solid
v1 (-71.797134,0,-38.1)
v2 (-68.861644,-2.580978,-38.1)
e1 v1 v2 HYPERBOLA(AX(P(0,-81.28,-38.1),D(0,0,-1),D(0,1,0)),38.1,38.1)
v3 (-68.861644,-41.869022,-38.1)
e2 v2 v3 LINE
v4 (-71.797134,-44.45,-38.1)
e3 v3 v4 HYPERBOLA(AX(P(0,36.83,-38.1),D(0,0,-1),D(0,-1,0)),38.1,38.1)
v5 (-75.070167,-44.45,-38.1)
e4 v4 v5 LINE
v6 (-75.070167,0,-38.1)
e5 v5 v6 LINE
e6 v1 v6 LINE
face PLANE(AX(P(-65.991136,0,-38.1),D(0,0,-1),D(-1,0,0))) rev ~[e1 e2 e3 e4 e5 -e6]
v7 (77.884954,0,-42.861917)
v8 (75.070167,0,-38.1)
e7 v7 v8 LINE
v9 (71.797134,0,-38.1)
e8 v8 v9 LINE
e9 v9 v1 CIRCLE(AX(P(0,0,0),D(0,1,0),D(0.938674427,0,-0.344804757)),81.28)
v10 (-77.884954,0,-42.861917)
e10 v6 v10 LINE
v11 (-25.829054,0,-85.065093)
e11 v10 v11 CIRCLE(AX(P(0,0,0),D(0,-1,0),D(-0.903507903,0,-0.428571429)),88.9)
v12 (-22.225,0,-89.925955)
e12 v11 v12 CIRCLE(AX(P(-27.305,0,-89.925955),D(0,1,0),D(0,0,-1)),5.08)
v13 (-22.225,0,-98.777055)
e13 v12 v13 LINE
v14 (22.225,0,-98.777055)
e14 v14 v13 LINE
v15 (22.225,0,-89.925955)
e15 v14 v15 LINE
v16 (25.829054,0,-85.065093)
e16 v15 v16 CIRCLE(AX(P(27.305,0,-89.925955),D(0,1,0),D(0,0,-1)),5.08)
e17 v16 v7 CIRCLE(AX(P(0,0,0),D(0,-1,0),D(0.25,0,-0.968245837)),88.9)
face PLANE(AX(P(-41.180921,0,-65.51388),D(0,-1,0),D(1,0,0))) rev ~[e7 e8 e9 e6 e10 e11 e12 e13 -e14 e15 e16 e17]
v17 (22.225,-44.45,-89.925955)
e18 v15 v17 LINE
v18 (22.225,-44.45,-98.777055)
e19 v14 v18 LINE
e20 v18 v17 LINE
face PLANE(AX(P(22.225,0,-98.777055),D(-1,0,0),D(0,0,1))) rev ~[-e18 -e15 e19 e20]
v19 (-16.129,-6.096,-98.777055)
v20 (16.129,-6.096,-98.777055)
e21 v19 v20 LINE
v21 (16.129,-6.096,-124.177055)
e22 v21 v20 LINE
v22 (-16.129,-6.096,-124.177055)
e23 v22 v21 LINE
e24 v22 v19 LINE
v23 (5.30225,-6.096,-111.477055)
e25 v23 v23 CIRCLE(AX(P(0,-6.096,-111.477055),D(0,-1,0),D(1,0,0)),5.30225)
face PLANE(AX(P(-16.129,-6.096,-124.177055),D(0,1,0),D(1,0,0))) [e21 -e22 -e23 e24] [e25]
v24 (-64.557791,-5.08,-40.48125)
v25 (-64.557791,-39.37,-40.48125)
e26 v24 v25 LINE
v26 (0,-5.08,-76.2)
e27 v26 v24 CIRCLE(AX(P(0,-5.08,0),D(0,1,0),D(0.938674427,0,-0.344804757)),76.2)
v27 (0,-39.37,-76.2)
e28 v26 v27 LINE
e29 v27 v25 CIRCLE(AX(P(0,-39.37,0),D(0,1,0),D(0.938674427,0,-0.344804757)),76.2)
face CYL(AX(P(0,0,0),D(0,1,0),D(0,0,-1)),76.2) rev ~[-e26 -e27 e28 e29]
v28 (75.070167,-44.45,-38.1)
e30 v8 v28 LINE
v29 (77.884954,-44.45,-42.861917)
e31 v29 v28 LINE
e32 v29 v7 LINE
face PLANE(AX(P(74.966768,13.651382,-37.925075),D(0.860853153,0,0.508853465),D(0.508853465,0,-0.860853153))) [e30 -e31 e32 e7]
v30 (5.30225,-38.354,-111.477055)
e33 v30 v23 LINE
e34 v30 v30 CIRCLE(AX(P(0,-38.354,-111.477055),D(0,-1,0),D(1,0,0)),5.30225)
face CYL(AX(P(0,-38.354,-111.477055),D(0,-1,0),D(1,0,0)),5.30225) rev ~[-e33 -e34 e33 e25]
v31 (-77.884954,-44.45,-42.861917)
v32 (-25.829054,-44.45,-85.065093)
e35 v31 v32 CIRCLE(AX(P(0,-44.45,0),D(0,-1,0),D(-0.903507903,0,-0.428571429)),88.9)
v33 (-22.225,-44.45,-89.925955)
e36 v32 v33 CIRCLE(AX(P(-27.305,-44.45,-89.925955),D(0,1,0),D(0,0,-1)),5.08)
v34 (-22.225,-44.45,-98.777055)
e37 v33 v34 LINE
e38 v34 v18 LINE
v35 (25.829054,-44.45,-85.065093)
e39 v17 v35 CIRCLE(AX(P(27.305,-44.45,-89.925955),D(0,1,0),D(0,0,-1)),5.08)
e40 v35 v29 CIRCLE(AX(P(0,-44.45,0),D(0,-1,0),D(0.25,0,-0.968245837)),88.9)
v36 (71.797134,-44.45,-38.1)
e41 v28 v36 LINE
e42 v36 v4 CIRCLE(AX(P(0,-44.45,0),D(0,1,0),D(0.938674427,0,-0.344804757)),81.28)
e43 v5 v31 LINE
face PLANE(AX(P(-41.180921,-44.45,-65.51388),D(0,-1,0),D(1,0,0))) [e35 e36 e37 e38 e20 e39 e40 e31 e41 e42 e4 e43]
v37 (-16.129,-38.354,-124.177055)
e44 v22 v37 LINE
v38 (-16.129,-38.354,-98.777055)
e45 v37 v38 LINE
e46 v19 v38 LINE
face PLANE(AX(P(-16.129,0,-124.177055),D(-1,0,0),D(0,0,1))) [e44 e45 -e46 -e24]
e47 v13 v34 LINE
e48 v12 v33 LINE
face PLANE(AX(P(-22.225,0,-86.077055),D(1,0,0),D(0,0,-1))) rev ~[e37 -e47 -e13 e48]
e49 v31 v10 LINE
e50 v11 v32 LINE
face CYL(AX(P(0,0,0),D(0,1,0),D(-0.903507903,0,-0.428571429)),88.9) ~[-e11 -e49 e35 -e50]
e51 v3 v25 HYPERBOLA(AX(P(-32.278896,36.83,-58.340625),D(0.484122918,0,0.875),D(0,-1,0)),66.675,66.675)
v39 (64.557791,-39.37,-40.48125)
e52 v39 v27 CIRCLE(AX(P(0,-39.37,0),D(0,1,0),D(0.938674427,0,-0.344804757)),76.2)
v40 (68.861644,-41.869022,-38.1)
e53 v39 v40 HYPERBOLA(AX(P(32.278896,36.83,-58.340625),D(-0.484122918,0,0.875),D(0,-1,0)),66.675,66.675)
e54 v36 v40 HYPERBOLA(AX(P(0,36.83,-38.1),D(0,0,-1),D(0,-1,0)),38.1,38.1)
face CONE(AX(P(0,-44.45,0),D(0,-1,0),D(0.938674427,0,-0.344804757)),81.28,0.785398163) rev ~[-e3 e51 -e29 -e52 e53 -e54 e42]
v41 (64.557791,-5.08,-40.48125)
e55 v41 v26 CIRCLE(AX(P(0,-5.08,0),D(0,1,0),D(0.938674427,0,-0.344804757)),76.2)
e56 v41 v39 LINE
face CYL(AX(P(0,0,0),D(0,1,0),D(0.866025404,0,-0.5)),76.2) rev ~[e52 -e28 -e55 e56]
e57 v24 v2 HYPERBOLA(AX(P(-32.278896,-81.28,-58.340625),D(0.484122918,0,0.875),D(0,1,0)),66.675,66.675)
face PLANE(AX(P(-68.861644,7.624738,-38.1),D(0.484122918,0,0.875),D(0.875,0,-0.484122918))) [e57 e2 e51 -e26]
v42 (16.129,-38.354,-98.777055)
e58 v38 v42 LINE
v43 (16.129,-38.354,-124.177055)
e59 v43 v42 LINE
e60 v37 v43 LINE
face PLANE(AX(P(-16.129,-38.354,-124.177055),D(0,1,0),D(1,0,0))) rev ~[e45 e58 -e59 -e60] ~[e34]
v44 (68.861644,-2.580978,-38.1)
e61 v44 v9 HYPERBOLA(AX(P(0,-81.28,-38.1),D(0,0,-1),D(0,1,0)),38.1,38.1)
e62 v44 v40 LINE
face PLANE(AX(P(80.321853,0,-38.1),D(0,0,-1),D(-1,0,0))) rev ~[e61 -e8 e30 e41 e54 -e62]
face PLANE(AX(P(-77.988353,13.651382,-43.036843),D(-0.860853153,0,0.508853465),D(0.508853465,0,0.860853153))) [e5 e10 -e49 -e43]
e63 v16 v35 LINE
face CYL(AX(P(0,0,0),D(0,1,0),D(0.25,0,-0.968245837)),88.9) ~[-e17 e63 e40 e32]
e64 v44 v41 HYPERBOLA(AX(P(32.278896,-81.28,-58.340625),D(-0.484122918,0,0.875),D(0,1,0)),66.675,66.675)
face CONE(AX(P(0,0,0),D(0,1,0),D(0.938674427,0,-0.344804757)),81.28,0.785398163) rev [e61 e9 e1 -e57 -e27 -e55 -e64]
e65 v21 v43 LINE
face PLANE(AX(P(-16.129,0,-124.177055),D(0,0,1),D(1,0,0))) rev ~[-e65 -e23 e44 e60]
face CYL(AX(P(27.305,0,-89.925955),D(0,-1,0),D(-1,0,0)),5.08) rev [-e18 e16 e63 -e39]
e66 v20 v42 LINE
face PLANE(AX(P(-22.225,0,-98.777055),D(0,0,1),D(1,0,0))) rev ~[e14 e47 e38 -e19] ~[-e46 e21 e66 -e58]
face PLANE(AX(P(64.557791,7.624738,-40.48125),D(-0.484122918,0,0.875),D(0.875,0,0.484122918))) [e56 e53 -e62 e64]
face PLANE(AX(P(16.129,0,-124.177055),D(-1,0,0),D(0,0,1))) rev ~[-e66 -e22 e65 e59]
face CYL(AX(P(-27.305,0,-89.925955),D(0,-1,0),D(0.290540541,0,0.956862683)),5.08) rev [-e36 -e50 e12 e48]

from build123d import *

# Parameters (mm, degrees)
F0_W        = 16.129
F0_H        = 25.4
F1_DEPTH    = 44.45
F2_W        = 32.258
F2_H        = 6.096
F3_DEPTH    = 25.4
F4_R        = 5.30225
F5_DEPTH    = 38.355
F6_R        = 5.08
F7_T1_DEPTH = 59.6994752683
F7_T4_ANGLE = 139.6602442287
F7_T6_ANGLE = 139.6602442287
F8_T1_DEPTH = 71.752763855


# Not quite as in the source:
# - a fillet or chamfer that OpenCascade refuses, or shapes differently, is made with other operations: its cross-section is extruded or revolved along the edge and cut away or added


with BuildPart() as f1:
    # F0 (on Front) → F1 (new body)
    with BuildSketch(Plane.XZ):
        with BuildLine():
            ThreePointArc((0, -76.2), (-38.1, -65.9911357684), (-65.9911357684, -38.1))
            Line((-65.9911357684, -38.1), (-80.3218525683, -38.1))
            ThreePointArc((-80.3218525683, -38.1), (-56.6075409411, -68.5477666201), (-22.225, -86.0770548695))
            Line((-22.225, -86.0770548695), (0, -86.0770548695))
            Line((0, -86.0770548695), (0, -76.2))
        make_face()
        with BuildLine():
            Line((80.3218525683, -38.1), (65.9911357684, -38.1))
            ThreePointArc((65.9911357684, -38.1), (38.1, -65.9911357684), (0, -76.2))
            Line((0, -76.2), (0, -86.0770548695))
            Line((0, -86.0770548695), (22.225, -86.0770548695))
            ThreePointArc((22.225, -86.0770548695), (56.6075409411, -68.5477666201), (80.3218525683, -38.1))
        make_face()
        with BuildLine():
            Line((22.225, -98.7770548695), (22.225, -86.0770548695))
            ThreePointArc((22.225, -86.0770548695), (11.2017816017, -88.1914399982), (0, -88.9))
            Line((0, -88.9), (0, -98.7770548695))
            Line((0, -98.7770548695), (16.129, -98.7770548695))
            Line((16.129, -98.7770548695), (22.225, -98.7770548695))
        make_face()
        with BuildLine():
            ThreePointArc((0, -88.9), (-11.2017816017, -88.1914399982), (-22.225, -86.0770548695))
            Line((-22.225, -86.0770548695), (-22.225, -98.7770548695))
            Line((-22.225, -98.7770548695), (-16.129, -98.7770548695))
            Line((-16.129, -98.7770548695), (0, -98.7770548695))
            Line((0, -98.7770548695), (0, -88.9))
        make_face()
        with Locations((8.0645, -111.4770548695)):
            Rectangle(F0_W, F0_H)
        with Locations((-8.0645, -111.4770548695)):
            Rectangle(F0_W, F0_H)
        with BuildLine():
            Line((22.225, -86.0770548695), (0, -86.0770548695))
            Line((0, -86.0770548695), (0, -88.9))
            ThreePointArc((0, -88.9), (11.2017816017, -88.1914399982), (22.225, -86.0770548695))
        make_face()
        with BuildLine():
            Line((0, -88.9), (0, -86.0770548695))
            Line((0, -86.0770548695), (-22.225, -86.0770548695))
            ThreePointArc((-22.225, -86.0770548695), (-11.2017816017, -88.1914399982), (0, -88.9))
        make_face()
    extrude(amount=F1_DEPTH)

    # F2 (on face) → F3 (cut)
    with BuildSketch(Plane(origin=(0, 0, -124.1770548695), x_dir=(1, 0, 0), z_dir=(0, 0, -1))):
        with Locations((0, 41.402)):
            Rectangle(F2_W, F2_H)
        with Locations((0, 3.048)):
            Rectangle(F2_W, F2_H)
    extrude(amount=-F3_DEPTH, mode=Mode.SUBTRACT)

    # F4 (on face) → F5 (cut, through all)
    with BuildSketch(Plane.XZ.offset(38.354)):
        with Locations((0, -111.4770548695)):
            Circle(F4_R)
    extrude(amount=-F5_DEPTH, mode=Mode.SUBTRACT)

    # F6
    f6_edges = [f1.edges().sort_by_distance(p)[0] for p in [
        (-22.225, -22.225, -86.077055),
        (22.225, -22.225, -86.077055),
    ]]
    fillet(f6_edges, radius=F6_R)

    # F7: chamfer of 5.08 on 4 edges, made by hand

    # F7_s2 → F7_t1 (cut)
    with BuildSketch(Plane.XZ.offset(-7.6247376341)):
        with BuildLine():
            Line((-68.8616438956, -38.1), (-64.5577911521, -40.48125))
            ThreePointArc((-64.5577911521, -40.48125), (-65.2398633811, -39.3725821609), (-65.9911357684, -38.1))
            Line((-65.9911357684, -38.1), (-68.8616438956, -38.1))
        make_face()
        with BuildLine():
            Line((64.5577911521, -40.48125), (68.8616438956, -38.1))
            Line((68.8616438956, -38.1), (65.9911357684, -38.1))
            ThreePointArc((65.9911357684, -38.1), (65.2398633811, -39.3725821609), (64.5577911521, -40.48125))
        make_face()
    extrude(amount=F7_T1_DEPTH, mode=Mode.SUBTRACT)

    # F7_s3 → F7_t4 (revolve, cut)
    with BuildSketch(Plane(origin=(0, 0, 0), x_dir=(0, 1, 0), z_dir=(0.3448047573, 0, 0.9386744267))):
        Polygon((-44.45, -81.28), (-39.37, -76.2), (-44.45, -76.2), align=None)
    revolve(axis=Axis((0, -44.45, 0), (0, 1, 0)), revolution_arc=F7_T4_ANGLE, mode=Mode.SUBTRACT)

    # F7_s5 → F7_t6 (revolve, cut)
    with BuildSketch(Plane(origin=(0, 0, 0), x_dir=(0, 1, 0), z_dir=(0.3448047573, 0, 0.9386744267))):
        Polygon((0, -81.28), (-5.08, -76.2), (0, -76.2), align=None)
    revolve(axis=Axis((0, 0, 0), (0, 1, 0)), revolution_arc=F7_T6_ANGLE, mode=Mode.SUBTRACT)

    # F8: chamfer of 5.08 on 2 edges, made by hand

    # F8_s2 → F8_t1 (cut)
    with BuildSketch(Plane.XZ.offset(-13.6513819275)):
        with BuildLine():
            Line((74.966768006, -37.9250746392), (77.988352908, -43.0368427057))
            Line((77.988352908, -43.0368427057), (78.0773642839, -43.0858277541))
            ThreePointArc((78.0773642839, -43.0858277541), (79.2049019091, -40.5939443284), (80.4136489712, -38.1435428571))
            Line((80.4136489712, -38.1435428571), (80.3218525683, -37.9984))
            ThreePointArc((80.3218525683, -37.9984), (77.6443102871, -37.9984), (74.966768006, -37.8234746392))
            Line((74.966768006, -37.8234746392), (74.966768006, -37.9250746392))
        make_face()
        with BuildLine():
            Line((-77.988352908, -43.0368427057), (-74.966768006, -37.9250746392))
            Line((-74.966768006, -37.9250746392), (-74.966768006, -37.8234746392))
            ThreePointArc((-74.966768006, -37.8234746392), (-77.6443102871, -37.9984), (-80.3218525683, -37.9984))
            Line((-80.3218525683, -37.9984), (-80.4136489712, -38.1435428571))
            ThreePointArc((-80.4136489712, -38.1435428571), (-79.2049019091, -40.5939443284), (-78.0773642839, -43.0858277541))
            Line((-78.0773642839, -43.0858277541), (-77.988352908, -43.0368427057))
        make_face()
    extrude(amount=F8_T1_DEPTH, mode=Mode.SUBTRACT)


solid = f1.part
